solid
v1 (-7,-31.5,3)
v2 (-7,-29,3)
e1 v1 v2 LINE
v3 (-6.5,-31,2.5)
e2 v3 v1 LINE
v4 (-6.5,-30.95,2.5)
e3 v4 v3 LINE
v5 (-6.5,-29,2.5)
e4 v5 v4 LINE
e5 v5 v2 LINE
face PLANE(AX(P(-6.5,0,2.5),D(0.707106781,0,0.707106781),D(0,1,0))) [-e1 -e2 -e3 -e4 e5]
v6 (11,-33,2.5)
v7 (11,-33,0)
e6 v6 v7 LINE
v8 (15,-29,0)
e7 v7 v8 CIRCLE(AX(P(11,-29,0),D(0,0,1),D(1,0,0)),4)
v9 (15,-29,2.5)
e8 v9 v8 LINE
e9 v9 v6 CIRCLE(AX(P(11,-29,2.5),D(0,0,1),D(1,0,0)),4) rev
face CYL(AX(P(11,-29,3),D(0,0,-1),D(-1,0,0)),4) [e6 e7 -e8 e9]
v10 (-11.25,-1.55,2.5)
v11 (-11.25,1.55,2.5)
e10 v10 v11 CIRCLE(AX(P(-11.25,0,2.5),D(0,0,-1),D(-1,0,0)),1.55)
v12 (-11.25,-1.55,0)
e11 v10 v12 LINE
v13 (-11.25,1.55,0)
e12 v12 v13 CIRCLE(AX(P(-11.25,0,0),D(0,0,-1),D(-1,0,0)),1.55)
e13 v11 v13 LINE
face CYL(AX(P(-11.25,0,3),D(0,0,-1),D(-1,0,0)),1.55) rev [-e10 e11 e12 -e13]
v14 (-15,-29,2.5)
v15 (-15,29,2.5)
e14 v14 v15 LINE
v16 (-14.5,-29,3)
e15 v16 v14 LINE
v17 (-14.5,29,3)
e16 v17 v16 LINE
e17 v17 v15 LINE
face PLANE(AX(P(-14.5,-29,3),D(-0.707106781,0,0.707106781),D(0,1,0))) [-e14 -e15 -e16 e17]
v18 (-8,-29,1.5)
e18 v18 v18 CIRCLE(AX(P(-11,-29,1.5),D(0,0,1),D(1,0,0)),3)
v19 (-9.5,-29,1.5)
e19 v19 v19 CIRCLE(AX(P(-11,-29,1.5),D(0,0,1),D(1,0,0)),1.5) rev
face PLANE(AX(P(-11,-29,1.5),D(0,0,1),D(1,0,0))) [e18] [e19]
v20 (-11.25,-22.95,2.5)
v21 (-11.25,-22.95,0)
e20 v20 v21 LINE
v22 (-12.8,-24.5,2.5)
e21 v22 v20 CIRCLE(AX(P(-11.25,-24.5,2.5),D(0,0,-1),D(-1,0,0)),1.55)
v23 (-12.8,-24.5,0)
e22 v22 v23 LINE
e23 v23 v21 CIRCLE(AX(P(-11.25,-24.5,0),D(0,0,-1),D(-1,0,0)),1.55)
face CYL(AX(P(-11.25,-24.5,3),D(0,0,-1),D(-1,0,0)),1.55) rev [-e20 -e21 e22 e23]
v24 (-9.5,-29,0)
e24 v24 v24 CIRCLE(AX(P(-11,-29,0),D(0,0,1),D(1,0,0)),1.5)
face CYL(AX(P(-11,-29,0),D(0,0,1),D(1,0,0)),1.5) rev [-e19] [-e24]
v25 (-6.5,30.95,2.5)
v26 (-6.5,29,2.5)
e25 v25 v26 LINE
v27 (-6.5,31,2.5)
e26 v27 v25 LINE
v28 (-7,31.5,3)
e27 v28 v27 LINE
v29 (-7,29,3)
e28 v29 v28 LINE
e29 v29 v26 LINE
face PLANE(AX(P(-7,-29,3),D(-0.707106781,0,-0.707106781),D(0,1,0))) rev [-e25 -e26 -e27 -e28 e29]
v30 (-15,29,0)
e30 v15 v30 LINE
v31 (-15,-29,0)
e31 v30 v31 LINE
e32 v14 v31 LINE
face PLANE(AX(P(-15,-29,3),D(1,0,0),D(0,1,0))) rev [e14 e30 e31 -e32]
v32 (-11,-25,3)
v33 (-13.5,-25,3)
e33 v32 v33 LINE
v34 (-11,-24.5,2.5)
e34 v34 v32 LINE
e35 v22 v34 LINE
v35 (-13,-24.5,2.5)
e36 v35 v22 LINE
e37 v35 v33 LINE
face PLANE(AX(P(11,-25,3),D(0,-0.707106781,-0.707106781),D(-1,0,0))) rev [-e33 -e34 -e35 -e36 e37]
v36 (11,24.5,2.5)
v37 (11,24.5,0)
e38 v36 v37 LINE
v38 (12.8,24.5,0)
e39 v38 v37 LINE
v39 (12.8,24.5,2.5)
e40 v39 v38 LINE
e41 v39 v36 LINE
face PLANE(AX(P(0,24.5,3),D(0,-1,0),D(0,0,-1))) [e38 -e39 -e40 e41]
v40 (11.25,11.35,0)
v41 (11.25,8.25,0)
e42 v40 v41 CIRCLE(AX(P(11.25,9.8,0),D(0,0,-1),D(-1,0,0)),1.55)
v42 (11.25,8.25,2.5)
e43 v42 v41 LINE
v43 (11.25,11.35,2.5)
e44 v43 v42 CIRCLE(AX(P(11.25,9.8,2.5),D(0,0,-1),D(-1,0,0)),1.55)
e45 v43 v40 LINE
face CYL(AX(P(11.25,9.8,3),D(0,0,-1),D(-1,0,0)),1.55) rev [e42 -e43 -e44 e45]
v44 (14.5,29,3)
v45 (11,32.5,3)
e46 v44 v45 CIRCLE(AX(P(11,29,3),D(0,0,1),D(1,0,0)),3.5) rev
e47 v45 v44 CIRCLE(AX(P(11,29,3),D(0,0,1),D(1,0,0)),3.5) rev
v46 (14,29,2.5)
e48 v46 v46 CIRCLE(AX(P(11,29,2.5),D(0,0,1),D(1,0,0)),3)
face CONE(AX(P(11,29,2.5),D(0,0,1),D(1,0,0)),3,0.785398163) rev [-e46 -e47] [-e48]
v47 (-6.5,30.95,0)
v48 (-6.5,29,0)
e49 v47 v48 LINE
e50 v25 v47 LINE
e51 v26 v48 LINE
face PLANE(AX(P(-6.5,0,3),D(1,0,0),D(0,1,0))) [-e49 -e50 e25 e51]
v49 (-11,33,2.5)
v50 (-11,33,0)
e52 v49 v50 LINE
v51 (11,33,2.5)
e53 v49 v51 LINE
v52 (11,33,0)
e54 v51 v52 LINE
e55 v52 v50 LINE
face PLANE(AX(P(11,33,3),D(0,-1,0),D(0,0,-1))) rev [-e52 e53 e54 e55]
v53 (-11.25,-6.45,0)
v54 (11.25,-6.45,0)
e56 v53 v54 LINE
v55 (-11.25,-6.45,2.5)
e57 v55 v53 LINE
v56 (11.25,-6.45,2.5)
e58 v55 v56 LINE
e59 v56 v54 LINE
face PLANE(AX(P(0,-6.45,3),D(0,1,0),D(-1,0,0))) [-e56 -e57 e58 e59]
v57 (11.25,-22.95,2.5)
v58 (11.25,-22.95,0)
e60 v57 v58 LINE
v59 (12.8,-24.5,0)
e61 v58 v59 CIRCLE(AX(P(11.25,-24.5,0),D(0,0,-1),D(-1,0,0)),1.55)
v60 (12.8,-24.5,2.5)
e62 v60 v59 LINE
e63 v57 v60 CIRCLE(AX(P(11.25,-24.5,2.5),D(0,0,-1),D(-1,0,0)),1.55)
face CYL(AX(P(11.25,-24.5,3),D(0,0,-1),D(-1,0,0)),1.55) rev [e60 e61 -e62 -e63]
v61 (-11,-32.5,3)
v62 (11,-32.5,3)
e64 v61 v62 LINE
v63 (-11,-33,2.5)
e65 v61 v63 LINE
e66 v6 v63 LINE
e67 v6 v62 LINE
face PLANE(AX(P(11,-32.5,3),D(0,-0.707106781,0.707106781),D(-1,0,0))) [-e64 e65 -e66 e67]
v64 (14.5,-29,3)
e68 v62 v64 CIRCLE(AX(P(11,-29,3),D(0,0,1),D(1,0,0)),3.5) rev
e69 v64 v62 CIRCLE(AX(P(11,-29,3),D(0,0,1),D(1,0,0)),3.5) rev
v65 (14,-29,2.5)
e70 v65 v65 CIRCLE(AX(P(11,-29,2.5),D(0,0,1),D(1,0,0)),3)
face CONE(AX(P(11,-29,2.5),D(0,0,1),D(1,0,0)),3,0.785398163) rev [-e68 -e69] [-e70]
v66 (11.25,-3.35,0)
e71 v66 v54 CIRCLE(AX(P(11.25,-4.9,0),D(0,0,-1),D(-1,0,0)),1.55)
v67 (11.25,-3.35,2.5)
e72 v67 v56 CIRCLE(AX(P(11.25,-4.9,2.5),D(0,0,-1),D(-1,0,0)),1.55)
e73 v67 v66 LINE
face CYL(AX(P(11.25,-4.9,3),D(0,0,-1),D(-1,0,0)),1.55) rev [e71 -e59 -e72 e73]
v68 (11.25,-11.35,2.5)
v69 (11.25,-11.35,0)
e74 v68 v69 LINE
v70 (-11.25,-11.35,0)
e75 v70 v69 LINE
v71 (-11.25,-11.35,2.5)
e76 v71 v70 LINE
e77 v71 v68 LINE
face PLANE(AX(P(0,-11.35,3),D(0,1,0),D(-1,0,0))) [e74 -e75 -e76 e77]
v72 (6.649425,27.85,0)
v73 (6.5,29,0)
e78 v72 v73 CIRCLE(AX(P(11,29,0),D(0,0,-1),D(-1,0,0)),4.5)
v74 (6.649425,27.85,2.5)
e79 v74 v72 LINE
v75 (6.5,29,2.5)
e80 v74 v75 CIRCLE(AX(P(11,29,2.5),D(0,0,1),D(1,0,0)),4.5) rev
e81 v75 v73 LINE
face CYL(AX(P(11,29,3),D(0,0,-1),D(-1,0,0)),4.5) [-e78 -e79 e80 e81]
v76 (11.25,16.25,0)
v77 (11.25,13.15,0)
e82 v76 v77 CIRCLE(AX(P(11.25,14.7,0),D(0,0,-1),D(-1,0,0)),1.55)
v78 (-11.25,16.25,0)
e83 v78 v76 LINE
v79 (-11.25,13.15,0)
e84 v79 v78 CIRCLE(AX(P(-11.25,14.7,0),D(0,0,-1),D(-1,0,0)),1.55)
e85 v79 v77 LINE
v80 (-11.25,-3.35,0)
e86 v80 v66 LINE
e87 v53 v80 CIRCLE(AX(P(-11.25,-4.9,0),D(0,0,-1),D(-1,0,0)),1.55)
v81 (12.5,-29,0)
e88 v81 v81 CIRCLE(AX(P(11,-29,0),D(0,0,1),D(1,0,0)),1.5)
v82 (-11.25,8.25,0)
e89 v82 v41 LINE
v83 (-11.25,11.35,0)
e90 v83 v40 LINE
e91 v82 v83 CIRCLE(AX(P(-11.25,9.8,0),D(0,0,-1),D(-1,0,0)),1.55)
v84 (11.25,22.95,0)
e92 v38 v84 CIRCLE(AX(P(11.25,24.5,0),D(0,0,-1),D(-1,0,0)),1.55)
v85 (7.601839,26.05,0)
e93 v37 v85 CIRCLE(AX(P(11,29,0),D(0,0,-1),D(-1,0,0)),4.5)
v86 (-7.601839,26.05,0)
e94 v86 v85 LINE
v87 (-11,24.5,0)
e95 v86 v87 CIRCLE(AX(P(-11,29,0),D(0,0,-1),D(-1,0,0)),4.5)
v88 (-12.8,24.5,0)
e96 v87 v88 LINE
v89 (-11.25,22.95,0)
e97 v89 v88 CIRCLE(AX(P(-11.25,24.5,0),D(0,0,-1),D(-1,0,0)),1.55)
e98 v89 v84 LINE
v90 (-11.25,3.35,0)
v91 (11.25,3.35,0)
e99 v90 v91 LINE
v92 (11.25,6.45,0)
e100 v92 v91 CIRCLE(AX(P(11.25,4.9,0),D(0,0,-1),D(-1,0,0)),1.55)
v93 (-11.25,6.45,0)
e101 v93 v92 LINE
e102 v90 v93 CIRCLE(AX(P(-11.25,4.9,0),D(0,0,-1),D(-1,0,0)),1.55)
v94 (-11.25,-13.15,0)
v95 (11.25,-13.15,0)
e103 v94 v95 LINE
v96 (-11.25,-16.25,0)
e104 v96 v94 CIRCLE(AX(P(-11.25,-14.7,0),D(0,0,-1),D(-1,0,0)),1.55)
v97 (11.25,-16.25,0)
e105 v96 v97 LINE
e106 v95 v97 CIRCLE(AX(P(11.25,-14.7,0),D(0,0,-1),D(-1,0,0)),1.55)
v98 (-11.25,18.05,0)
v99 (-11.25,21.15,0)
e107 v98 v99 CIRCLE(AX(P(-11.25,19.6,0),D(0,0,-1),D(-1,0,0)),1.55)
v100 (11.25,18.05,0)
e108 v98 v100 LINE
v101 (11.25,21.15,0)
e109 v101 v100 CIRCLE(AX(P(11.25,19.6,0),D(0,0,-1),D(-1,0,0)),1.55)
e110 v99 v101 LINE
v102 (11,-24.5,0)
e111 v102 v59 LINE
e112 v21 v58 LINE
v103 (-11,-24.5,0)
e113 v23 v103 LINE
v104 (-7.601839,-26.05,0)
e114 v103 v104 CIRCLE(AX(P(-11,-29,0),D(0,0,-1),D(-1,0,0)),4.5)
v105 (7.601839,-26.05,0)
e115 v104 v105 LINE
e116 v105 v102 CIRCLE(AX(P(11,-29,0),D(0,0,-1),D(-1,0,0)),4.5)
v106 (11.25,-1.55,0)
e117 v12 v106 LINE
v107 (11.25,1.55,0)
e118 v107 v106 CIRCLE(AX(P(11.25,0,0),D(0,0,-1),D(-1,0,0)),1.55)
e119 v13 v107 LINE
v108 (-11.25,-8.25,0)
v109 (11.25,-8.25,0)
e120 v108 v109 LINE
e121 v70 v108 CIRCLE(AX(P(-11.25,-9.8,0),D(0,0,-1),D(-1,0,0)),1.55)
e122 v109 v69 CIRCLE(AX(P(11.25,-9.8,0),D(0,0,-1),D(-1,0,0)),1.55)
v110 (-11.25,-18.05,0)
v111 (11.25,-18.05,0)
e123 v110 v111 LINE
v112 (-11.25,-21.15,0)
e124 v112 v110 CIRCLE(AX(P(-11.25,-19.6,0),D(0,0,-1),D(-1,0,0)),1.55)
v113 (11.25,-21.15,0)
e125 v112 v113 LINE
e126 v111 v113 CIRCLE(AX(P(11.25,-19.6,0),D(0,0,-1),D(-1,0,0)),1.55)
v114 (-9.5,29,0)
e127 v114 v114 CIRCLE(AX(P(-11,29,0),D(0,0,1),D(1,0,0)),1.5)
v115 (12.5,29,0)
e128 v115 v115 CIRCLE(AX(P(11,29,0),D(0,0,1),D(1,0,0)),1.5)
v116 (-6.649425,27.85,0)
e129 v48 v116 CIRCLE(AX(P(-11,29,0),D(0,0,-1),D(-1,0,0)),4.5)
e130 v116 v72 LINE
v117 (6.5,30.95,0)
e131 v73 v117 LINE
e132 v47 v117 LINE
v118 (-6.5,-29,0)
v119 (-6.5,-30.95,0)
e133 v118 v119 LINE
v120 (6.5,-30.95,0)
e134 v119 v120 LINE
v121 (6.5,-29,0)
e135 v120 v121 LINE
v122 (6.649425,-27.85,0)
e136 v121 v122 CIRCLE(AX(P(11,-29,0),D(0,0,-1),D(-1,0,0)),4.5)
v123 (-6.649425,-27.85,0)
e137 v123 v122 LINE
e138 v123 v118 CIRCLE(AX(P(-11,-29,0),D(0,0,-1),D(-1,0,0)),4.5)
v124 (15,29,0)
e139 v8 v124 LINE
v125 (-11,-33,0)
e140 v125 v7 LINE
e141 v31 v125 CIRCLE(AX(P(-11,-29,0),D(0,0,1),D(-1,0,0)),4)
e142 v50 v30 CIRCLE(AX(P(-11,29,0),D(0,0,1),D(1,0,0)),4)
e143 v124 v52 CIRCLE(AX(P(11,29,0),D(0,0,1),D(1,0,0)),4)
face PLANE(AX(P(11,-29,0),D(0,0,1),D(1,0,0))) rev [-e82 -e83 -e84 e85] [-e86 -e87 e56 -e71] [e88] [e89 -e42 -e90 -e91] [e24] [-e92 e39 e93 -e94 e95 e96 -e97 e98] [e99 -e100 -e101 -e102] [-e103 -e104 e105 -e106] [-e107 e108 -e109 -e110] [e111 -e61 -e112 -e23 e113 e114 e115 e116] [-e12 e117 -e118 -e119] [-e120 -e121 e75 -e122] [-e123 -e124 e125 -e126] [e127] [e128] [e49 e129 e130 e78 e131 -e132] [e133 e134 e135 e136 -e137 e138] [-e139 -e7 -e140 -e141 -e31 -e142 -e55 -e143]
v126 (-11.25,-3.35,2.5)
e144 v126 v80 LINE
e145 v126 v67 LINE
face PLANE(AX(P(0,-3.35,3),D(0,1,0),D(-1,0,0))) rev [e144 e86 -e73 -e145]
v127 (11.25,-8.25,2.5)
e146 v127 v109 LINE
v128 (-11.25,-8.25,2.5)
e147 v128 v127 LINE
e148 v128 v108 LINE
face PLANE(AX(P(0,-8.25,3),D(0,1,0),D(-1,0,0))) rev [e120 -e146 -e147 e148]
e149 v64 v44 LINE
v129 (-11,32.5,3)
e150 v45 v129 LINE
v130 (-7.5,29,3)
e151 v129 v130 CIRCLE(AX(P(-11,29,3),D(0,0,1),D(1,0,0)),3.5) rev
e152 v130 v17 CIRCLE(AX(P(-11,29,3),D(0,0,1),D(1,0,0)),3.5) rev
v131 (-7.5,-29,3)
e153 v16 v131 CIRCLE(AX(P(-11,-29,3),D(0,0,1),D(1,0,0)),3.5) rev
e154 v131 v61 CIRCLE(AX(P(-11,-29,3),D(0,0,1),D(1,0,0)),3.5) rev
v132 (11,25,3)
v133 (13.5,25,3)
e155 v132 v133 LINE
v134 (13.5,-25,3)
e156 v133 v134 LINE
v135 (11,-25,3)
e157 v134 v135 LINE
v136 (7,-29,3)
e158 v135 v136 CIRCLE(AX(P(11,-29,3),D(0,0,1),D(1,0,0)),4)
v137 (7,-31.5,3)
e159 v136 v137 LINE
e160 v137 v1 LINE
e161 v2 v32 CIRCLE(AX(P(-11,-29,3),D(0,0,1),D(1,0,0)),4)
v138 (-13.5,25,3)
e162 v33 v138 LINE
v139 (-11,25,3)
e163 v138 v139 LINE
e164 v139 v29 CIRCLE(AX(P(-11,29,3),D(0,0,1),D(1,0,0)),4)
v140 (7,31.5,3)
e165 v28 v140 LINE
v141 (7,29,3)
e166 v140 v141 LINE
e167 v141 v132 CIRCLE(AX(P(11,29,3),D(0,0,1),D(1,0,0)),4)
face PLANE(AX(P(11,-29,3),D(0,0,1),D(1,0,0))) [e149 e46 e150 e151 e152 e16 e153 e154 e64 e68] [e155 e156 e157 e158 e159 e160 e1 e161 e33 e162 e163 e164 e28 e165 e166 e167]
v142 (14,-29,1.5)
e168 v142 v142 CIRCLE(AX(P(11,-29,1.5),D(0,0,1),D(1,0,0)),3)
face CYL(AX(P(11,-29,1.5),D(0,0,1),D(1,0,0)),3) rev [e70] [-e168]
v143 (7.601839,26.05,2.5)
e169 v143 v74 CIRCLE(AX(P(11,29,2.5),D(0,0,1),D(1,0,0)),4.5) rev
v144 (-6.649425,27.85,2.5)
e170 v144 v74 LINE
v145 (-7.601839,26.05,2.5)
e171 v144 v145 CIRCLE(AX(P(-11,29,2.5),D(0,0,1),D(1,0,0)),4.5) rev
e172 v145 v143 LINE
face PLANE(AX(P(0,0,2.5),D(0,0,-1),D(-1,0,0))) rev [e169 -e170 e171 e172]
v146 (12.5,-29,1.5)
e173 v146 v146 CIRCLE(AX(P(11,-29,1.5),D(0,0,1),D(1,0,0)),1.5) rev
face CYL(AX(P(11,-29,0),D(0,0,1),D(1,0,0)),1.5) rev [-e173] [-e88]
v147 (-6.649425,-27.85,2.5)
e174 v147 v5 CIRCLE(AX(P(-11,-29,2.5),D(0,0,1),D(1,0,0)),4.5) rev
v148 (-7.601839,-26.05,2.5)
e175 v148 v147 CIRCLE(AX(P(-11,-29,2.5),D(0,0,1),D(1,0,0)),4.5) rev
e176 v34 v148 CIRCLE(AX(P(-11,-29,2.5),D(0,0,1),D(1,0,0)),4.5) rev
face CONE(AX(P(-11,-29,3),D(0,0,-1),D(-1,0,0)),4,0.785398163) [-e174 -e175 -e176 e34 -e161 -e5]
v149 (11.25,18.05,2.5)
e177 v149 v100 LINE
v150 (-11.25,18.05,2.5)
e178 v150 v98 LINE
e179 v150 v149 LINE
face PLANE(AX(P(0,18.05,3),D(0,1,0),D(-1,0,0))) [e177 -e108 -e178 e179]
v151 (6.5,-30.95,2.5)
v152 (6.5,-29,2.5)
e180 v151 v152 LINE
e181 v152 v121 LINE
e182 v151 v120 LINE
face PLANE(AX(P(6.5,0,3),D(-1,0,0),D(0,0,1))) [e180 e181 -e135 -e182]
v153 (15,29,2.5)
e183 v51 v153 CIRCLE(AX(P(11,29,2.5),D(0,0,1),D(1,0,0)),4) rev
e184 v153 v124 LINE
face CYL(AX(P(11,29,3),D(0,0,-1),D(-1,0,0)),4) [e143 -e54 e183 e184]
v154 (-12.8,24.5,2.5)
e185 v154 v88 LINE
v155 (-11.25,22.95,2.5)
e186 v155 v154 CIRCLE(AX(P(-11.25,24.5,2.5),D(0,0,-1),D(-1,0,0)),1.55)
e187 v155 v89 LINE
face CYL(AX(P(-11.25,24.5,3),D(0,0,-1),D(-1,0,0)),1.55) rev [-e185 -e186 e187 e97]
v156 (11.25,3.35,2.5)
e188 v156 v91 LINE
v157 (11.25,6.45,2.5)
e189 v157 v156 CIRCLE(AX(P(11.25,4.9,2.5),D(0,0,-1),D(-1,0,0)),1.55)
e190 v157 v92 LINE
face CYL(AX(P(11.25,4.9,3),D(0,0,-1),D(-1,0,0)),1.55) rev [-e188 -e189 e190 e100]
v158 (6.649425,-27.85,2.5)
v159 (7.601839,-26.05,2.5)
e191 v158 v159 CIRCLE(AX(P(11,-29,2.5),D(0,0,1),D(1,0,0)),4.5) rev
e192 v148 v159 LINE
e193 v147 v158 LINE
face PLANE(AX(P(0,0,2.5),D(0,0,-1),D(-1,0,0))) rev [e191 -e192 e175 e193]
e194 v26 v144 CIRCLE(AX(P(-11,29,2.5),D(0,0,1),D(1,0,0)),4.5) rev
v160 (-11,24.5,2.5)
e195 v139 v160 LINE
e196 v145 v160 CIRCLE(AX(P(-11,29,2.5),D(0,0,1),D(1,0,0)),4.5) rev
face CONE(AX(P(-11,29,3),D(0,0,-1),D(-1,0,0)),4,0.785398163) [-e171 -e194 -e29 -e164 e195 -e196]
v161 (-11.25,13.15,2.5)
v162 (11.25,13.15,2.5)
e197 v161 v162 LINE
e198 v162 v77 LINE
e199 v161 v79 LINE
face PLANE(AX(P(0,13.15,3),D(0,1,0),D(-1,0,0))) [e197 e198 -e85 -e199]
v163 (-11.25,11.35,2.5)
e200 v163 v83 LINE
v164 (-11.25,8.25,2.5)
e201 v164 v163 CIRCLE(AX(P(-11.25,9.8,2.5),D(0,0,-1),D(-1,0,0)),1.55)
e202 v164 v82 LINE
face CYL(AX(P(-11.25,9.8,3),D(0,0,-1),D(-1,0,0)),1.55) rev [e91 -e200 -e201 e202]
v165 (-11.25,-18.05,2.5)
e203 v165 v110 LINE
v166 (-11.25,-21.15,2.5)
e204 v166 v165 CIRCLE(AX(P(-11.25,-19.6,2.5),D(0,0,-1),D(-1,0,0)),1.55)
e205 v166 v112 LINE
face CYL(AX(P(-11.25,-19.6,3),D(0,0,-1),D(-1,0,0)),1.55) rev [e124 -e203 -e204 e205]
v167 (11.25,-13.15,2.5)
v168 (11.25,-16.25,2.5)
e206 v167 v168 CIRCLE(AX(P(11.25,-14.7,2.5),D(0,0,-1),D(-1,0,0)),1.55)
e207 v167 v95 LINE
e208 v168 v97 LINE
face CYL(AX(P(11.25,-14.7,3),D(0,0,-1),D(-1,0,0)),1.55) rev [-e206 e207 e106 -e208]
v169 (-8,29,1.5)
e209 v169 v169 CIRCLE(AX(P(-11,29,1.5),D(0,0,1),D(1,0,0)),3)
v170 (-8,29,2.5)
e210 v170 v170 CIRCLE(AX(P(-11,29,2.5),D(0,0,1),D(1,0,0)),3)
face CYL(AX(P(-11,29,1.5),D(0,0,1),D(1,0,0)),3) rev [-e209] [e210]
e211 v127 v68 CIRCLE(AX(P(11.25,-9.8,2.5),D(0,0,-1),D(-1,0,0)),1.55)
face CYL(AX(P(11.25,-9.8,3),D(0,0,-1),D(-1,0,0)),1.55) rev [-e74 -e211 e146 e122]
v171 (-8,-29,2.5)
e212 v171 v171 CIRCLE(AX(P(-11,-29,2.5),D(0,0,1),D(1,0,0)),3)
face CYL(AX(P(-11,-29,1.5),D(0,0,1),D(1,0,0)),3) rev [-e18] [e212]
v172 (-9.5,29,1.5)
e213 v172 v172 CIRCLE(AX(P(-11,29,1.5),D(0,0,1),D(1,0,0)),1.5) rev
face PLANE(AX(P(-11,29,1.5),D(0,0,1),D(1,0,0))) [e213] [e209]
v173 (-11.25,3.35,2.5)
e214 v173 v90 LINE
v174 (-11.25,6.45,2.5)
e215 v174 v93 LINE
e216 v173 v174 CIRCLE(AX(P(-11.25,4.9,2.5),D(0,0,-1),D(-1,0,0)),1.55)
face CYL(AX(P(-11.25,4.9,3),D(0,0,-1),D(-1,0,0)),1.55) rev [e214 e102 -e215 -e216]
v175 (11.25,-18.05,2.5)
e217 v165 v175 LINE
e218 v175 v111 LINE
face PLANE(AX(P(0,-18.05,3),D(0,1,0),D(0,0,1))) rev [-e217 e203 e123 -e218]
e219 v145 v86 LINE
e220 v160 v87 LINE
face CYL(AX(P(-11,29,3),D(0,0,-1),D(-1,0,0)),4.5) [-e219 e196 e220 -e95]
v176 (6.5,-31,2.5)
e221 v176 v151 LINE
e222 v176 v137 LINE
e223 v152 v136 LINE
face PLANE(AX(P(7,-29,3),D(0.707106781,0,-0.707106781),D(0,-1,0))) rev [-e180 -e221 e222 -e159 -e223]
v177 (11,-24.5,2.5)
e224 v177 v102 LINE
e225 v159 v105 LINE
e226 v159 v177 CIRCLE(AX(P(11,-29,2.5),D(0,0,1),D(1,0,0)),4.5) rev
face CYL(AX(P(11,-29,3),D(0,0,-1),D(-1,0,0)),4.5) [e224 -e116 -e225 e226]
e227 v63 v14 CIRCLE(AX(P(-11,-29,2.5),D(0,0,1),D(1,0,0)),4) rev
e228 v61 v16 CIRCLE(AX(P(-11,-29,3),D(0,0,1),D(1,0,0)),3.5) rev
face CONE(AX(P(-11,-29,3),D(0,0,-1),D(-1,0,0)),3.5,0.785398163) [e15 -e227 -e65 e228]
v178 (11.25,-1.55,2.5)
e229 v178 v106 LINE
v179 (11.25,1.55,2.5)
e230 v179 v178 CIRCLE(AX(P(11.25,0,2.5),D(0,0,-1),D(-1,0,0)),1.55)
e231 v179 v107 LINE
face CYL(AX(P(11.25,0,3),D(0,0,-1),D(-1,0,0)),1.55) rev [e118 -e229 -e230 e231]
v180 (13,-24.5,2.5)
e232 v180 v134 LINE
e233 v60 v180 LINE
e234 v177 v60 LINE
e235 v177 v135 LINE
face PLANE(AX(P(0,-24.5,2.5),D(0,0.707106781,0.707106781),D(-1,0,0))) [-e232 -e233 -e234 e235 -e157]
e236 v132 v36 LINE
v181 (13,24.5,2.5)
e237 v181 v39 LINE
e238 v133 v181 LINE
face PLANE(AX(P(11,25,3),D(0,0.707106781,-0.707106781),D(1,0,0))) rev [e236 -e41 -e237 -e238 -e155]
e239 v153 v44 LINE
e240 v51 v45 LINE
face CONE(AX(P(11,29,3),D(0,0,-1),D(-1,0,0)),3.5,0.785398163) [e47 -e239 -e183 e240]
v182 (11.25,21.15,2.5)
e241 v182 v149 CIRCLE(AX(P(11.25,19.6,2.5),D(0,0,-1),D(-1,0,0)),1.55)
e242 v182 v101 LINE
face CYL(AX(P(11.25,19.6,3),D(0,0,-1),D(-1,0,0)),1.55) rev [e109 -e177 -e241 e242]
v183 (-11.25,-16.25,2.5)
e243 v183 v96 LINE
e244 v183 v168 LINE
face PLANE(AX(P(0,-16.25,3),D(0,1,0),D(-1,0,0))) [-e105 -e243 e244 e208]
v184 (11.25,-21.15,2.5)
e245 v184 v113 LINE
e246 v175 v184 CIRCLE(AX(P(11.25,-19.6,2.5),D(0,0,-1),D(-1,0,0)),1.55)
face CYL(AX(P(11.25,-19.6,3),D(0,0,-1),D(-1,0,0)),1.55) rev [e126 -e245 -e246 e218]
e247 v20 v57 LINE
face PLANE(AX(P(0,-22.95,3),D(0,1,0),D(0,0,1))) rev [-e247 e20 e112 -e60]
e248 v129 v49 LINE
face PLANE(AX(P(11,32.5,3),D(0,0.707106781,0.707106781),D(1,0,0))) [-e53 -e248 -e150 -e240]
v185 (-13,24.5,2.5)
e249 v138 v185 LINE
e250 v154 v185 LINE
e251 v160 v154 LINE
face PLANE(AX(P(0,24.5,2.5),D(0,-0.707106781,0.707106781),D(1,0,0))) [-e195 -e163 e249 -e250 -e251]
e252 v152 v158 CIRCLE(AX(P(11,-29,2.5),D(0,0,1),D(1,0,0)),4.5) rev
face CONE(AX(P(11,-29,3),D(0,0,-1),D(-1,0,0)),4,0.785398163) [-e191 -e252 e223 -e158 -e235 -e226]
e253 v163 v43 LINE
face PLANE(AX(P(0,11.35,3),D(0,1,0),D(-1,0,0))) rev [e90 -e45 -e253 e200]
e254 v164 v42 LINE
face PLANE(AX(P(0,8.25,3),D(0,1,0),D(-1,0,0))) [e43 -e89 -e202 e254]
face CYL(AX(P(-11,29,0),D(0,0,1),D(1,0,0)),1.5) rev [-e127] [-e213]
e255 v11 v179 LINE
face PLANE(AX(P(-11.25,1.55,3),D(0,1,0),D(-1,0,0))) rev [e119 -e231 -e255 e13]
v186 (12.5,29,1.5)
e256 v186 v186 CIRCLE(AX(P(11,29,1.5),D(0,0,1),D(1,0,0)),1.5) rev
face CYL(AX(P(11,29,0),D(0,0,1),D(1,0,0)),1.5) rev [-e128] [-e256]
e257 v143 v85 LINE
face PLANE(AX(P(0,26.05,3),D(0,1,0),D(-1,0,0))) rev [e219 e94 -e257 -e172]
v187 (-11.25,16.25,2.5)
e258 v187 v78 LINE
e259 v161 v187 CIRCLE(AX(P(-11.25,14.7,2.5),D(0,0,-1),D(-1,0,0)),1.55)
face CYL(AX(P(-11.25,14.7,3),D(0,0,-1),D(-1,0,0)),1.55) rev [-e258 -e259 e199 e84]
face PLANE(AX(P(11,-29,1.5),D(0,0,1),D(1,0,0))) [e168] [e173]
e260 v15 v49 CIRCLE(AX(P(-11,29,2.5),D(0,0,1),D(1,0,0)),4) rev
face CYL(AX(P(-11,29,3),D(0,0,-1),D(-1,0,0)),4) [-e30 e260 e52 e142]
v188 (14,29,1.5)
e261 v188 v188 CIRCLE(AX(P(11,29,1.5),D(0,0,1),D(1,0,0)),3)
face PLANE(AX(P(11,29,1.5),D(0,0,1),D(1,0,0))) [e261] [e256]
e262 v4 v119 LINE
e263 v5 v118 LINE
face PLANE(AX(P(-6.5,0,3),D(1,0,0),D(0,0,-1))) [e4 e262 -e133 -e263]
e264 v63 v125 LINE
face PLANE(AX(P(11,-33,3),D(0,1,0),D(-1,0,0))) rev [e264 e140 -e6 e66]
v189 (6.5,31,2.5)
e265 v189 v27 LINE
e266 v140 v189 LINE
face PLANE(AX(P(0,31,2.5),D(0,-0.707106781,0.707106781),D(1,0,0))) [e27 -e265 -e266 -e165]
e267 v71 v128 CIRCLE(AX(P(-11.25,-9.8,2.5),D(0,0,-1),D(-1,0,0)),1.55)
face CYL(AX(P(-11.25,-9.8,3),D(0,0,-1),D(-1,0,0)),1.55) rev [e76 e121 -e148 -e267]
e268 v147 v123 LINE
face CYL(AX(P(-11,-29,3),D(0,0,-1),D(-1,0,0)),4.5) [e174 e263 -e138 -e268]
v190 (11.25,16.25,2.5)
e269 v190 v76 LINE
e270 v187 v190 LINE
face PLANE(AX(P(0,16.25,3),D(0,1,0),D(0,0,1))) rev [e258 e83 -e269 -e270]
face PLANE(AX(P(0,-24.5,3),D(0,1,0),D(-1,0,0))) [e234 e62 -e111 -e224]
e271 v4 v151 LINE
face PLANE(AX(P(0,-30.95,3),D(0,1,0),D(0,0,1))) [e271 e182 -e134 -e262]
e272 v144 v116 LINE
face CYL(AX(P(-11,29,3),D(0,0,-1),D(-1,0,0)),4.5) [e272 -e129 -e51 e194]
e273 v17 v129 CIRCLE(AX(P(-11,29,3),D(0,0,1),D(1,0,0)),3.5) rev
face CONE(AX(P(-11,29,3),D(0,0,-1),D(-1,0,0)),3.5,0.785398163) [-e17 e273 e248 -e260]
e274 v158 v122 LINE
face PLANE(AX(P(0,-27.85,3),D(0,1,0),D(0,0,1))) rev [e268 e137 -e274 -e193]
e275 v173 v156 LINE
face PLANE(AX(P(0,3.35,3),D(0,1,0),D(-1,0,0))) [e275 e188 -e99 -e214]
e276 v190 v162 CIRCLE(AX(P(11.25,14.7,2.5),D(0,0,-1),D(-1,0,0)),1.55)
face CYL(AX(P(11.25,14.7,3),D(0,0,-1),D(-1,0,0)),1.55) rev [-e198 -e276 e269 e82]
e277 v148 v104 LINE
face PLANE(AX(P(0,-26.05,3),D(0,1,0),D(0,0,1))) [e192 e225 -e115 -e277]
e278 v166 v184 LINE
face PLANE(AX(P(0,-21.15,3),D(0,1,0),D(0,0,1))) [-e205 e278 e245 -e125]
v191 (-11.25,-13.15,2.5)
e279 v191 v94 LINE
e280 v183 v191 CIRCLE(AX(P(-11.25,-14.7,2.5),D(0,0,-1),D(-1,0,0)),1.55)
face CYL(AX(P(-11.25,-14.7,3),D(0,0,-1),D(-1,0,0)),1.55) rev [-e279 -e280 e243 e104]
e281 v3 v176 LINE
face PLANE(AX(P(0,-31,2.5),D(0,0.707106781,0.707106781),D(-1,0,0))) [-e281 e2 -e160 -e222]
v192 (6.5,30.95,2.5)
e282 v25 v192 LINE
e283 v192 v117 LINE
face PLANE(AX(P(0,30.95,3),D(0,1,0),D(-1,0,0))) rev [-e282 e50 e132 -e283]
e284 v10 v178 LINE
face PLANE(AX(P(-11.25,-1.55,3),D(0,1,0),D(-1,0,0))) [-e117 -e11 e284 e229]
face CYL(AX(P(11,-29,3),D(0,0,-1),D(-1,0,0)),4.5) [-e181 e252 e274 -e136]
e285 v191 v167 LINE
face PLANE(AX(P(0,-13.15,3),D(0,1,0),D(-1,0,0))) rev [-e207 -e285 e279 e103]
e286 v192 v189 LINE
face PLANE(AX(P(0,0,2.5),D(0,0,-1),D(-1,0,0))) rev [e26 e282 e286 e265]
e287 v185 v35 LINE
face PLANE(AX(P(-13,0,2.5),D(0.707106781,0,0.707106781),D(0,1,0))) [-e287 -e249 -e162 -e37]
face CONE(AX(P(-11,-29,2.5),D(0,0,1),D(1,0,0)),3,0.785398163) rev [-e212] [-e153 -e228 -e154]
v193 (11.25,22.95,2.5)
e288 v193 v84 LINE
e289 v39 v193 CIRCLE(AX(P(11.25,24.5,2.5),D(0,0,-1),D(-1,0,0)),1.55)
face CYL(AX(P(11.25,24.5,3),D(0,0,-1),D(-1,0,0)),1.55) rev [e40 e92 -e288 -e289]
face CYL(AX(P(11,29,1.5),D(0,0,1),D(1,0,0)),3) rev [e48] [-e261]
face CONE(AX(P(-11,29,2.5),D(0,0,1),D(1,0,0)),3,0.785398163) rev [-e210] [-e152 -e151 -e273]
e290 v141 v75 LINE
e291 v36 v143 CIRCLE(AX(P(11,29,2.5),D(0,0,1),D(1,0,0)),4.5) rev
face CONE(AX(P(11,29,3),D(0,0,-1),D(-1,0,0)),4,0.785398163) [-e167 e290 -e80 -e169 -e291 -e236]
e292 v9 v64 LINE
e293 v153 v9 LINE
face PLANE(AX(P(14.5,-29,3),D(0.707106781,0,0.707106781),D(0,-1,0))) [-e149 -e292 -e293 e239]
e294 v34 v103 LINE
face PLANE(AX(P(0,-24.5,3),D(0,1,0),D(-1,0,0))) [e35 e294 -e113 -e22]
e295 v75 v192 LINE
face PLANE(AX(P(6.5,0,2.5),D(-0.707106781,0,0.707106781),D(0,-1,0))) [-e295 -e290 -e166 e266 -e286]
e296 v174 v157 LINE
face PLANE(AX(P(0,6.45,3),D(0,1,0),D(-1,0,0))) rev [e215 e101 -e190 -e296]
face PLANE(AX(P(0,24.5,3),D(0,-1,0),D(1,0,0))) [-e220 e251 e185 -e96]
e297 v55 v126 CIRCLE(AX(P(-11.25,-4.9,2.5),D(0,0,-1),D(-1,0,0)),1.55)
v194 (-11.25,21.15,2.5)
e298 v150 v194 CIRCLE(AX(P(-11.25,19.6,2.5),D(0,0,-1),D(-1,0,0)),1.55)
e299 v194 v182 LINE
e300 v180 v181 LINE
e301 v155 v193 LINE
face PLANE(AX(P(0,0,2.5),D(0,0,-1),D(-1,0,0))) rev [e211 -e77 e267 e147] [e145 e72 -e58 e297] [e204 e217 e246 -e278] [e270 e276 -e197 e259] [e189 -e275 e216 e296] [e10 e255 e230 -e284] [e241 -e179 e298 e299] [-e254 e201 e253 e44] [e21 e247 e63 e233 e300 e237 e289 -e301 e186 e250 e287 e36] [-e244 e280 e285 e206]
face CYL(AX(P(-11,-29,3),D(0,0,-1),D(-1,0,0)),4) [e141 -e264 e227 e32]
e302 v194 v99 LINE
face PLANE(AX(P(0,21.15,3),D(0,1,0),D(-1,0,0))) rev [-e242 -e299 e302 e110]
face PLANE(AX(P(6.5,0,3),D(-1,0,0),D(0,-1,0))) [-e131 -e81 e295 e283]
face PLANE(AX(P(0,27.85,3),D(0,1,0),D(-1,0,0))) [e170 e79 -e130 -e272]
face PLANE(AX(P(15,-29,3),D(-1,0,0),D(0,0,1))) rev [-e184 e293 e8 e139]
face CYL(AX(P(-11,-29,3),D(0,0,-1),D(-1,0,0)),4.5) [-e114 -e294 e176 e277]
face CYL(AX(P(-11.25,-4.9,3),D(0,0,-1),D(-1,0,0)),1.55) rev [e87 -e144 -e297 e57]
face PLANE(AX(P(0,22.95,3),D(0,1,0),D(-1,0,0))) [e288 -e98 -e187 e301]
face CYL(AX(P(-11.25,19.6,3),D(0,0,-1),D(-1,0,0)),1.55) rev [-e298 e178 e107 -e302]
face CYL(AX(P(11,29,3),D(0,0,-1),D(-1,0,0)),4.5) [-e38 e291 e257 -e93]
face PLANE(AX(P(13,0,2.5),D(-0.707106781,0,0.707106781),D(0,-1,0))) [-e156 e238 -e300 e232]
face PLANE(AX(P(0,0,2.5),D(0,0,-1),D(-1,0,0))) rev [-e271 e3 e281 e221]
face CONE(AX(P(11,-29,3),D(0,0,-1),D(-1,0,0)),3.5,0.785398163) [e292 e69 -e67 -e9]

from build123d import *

# Parameters (mm, degrees)
BASE_DEPTH          = 3
SKETCH2_R           = 1.5
CUT_EXTRUDE1_DEPTH  = 37.373066959
CUT_EXTRUDE2_DEPTH  = 37.373066959
SKETCH6_R           = 3
CUT_EXTRUDE3_DEPTH  = 1.5
CHAMFER2_SIZE       = 0.5
BOSS_EXTRUDE1_START = -2.5
BOSS_EXTRUDE1_DEPTH = 2.5
CUT_EXTRUDE4_START  = -2.5
CUT_EXTRUDE4_DEPTH  = 2.5


# Read off the part's stored shape, not the designer's step: Cut-Extrude4
with BuildPart() as part:
    # Sketch1 → Base (new body)
    with BuildSketch(Plane.XY):
        with BuildLine():
            Line((11, -33), (-11, -33))
            ThreePointArc((-11, -33), (-13.828427125, -31.828427125), (-15, -29))
            Line((-15, -29), (-15, 29))
            ThreePointArc((-15, 29), (-13.828427125, 31.828427125), (-11, 33))
            Line((-11, 33), (11, 33))
            ThreePointArc((11, 33), (13.828427125, 31.828427125), (15, 29))
            Line((15, 29), (15, -29))
            ThreePointArc((15, -29), (13.828427125, -31.828427125), (11, -33))
        make_face()
    extrude(amount=BASE_DEPTH)

    # Sketch2 → Cut-Extrude1 (cut, through all)
    with BuildSketch(Plane.XY.offset(3)):
        with Locations((-11, 29)):
            Circle(SKETCH2_R)
        with Locations((-11, -29)):
            Circle(SKETCH2_R)
        with Locations((11, -29)):
            Circle(SKETCH2_R)
        with Locations((11, 29)):
            Circle(SKETCH2_R)
    extrude(amount=-CUT_EXTRUDE1_DEPTH, mode=Mode.SUBTRACT)

    # Sketch3 → Cut-Extrude2 (cut, through all)
    with BuildSketch(Plane.XY.offset(3)):
        with BuildLine():
            Line((6.5, 29), (6.5, 31))
            Line((6.5, 31), (-6.5, 31))
            Line((-6.5, 31), (-6.5, 29))
            ThreePointArc((-6.5, 29), (-7.818019485, 25.818019485), (-11, 24.5))
            Line((-11, 24.5), (-13, 24.5))
            Line((-13, 24.5), (-13, -24.5))
            Line((-13, -24.5), (-11, -24.5))
            ThreePointArc((-11, -24.5), (-7.818019485, -25.818019485), (-6.5, -29))
            Line((-6.5, -29), (-6.5, -31))
            Line((-6.5, -31), (6.5, -31))
            Line((6.5, -31), (6.5, -29))
            ThreePointArc((6.5, -29), (7.818019485, -25.818019485), (11, -24.5))
            Line((11, -24.5), (13, -24.5))
            Line((13, -24.5), (13, 24.5))
            Line((13, 24.5), (11, 24.5))
            ThreePointArc((11, 24.5), (7.818019485, 25.818019485), (6.5, 29))
        make_face()
    extrude(amount=-CUT_EXTRUDE2_DEPTH, mode=Mode.SUBTRACT)

    # Sketch6 → Cut-Extrude3 (cut)
    with BuildSketch(Plane.XY.offset(3)):
        with Locations((-11, -29)):
            Circle(SKETCH6_R)
        with Locations((11, -29)):
            Circle(SKETCH6_R)
        with Locations((11, 29)):
            Circle(SKETCH6_R)
        with Locations((-11, 29)):
            Circle(SKETCH6_R)
    extrude(amount=-CUT_EXTRUDE3_DEPTH, mode=Mode.SUBTRACT)

    # Chamfer2
    chamfer2_edges = [part.edges().sort_by_distance(p)[0] for p in [
        (7.818019485, 25.818019485, 3),
        (13, 0, 3),
        (7.818019485, -25.818019485, 3),
        (-7.818019485, -25.818019485, 3),
        (-13, 0, 3),
        (-7.818019485, 25.818019485, 3),
        (0, -33, 3),
        (-13.828427125, -31.828427125, 3),
        (-15, 0, 3),
        (-13.828427125, 31.828427125, 3),
        (0, 33, 3),
        (13.828427125, 31.828427125, 3),
        (15, 0, 3),
        (13.828427125, -31.828427125, 3),
        (-14, -29, 3),
        (-14, 29, 3),
        (8, 29, 3),
        (8, -29, 3),
        (0, -31, 3),
        (0, 31, 3),
        (12, 24.5, 3),
        (6.5, 30, 3),
        (-6.5, 30, 3),
        (-12, 24.5, 3),
        (-12, -24.5, 3),
        (-6.5, -30, 3),
        (6.5, -30, 3),
        (12, -24.5, 3),
    ]]
    chamfer(chamfer2_edges, length=CHAMFER2_SIZE - 0.0001)  # a hair under: the kernel refuses the full size

    # Sketch9 → Boss-Extrude1 (add)
    with BuildSketch(Plane(origin=(0, 0, 0), x_dir=(-1, 0, 0), z_dir=(0, 0, -1)).offset(BOSS_EXTRUDE1_START)):
        with BuildLine():
            ThreePointArc((-6.5, -29), (-7.818019485, -25.818019485), (-11, -24.5))
            Line((-11, -24.5), (-13, -24.5))
            Line((-13, -24.5), (-13, 24.5))
            Line((-13, 24.5), (-11, 24.5))
            ThreePointArc((-11, 24.5), (-7.818019485, 25.818019485), (-6.5, 29))
            Line((-6.5, 29), (-6.5, 31))
            Line((-6.5, 31), (6.5, 31))
            Line((6.5, 31), (6.5, 29))
            ThreePointArc((6.5, 29), (7.818019485, 25.818019485), (11, 24.5))
            Line((11, 24.5), (13, 24.5))
            Line((13, 24.5), (13, -24.5))
            Line((13, -24.5), (11, -24.5))
            ThreePointArc((11, -24.5), (7.818019485, -25.818019485), (6.5, -29))
            Line((6.5, -29), (6.5, -31))
            Line((6.5, -31), (-6.5, -31))
            Line((-6.5, -31), (-6.5, -29))
        make_face()
    extrude(amount=BOSS_EXTRUDE1_DEPTH)

    # Cut-Extrude4 outline → Cut-Extrude4 (cut)
    with BuildSketch(Plane(origin=(0, 0, 0), x_dir=(-1, 0, 0), z_dir=(0, 0, -1)).offset(CUT_EXTRUDE4_START)):
        with BuildLine():
            ThreePointArc((11.25, -6.45), (12.8, -4.9), (11.25, -3.35))
            Line((11.25, -3.35), (-11.25, -3.35))
            ThreePointArc((-11.25, -3.35), (-12.8, -4.9), (-11.25, -6.45))
            Line((-11.25, -6.45), (11.25, -6.45))
        make_face()
        with BuildLine():
            ThreePointArc((11.25, 18.05), (12.8, 19.6), (11.25, 21.15))
            Line((11.25, 21.15), (-11.25, 21.15))
            ThreePointArc((-11.25, 21.15), (-12.8, 19.6), (-11.25, 18.05))
            Line((-11.25, 18.05), (11.25, 18.05))
        make_face()
        with BuildLine():
            Line((-11, 24.5), (-12.8, 24.5))
            ThreePointArc((-12.8, 24.5), (-12.346015511, 23.403984489), (-11.25, 22.95))
            Line((-11.25, 22.95), (11.25, 22.95))
            ThreePointArc((11.25, 22.95), (12.346015511, 23.403984489), (12.8, 24.5))
            Line((12.8, 24.5), (11, 24.5))
            ThreePointArc((11, 24.5), (9.13251506, 24.905796781), (7.601838732, 26.05))
            Line((7.601838732, 26.05), (-7.601838732, 26.05))
            ThreePointArc((-7.601838732, 26.05), (-9.13251506, 24.905796781), (-11, 24.5))
        make_face()
        with BuildLine():
            ThreePointArc((-6.5, 29), (-6.537512687, 28.420166419), (-6.649425325, 27.85))
            Line((-6.649425325, 27.85), (6.649425325, 27.85))
            ThreePointArc((6.649425325, 27.85), (6.537512687, 28.420166419), (6.5, 29))
            Line((6.5, 29), (6.5, 30.95))
            Line((6.5, 30.95), (-6.5, 30.95))
            Line((-6.5, 30.95), (-6.5, 29))
        make_face()
        with BuildLine():
            Line((6.5, -30.95), (6.5, -29))
            ThreePointArc((6.5, -29), (6.537512687, -28.420166419), (6.649425325, -27.85))
            Line((6.649425325, -27.85), (-6.649425325, -27.85))
            ThreePointArc((-6.649425325, -27.85), (-6.537512687, -28.420166419), (-6.5, -29))
            Line((-6.5, -29), (-6.5, -30.95))
            Line((-6.5, -30.95), (6.5, -30.95))
        make_face()
        with BuildLine():
            Line((-11.25, -1.55), (11.25, -1.55))
            ThreePointArc((11.25, -1.55), (12.8, 0), (11.25, 1.55))
            Line((11.25, 1.55), (-11.25, 1.55))
            ThreePointArc((-11.25, 1.55), (-12.8, 0), (-11.25, -1.55))
        make_face()
        with BuildLine():
            ThreePointArc((11.25, -11.35), (12.8, -9.8), (11.25, -8.25))
            Line((11.25, -8.25), (-11.25, -8.25))
            ThreePointArc((-11.25, -8.25), (-12.8, -9.8), (-11.25, -11.35))
            Line((-11.25, -11.35), (11.25, -11.35))
        make_face()
        with BuildLine():
            ThreePointArc((11.25, -16.25), (12.8, -14.7), (11.25, -13.15))
            Line((11.25, -13.15), (-11.25, -13.15))
            ThreePointArc((-11.25, -13.15), (-12.8, -14.7), (-11.25, -16.25))
            Line((-11.25, -16.25), (11.25, -16.25))
        make_face()
        with BuildLine():
            ThreePointArc((11.25, -21.15), (12.8, -19.6), (11.25, -18.05))
            Line((11.25, -18.05), (-11.25, -18.05))
            ThreePointArc((-11.25, -18.05), (-12.8, -19.6), (-11.25, -21.15))
            Line((-11.25, -21.15), (11.25, -21.15))
        make_face()
        with BuildLine():
            ThreePointArc((12.8, -24.5), (12.346015511, -23.403984489), (11.25, -22.95))
            Line((11.25, -22.95), (-11.25, -22.95))
            ThreePointArc((-11.25, -22.95), (-12.346015511, -23.403984489), (-12.8, -24.5))
            Line((-12.8, -24.5), (-11, -24.5))
            ThreePointArc((-11, -24.5), (-9.13251506, -24.905796781), (-7.601838732, -26.05))
            Line((-7.601838732, -26.05), (7.601838732, -26.05))
            ThreePointArc((7.601838732, -26.05), (9.13251506, -24.905796781), (11, -24.5))
            Line((11, -24.5), (12.8, -24.5))
        make_face()
        with BuildLine():
            ThreePointArc((11.25, 3.35), (12.8, 4.9), (11.25, 6.45))
            Line((11.25, 6.45), (-11.25, 6.45))
            ThreePointArc((-11.25, 6.45), (-12.8, 4.9), (-11.25, 3.35))
            Line((-11.25, 3.35), (11.25, 3.35))
        make_face()
        with BuildLine():
            ThreePointArc((11.25, 8.25), (12.8, 9.8), (11.25, 11.35))
            Line((11.25, 11.35), (-11.25, 11.35))
            ThreePointArc((-11.25, 11.35), (-12.8, 9.8), (-11.25, 8.25))
            Line((-11.25, 8.25), (11.25, 8.25))
        make_face()
        with BuildLine():
            ThreePointArc((11.25, 13.15), (12.8, 14.7), (11.25, 16.25))
            Line((11.25, 16.25), (-11.25, 16.25))
            ThreePointArc((-11.25, 16.25), (-12.8, 14.7), (-11.25, 13.15))
            Line((-11.25, 13.15), (11.25, 13.15))
        make_face()
    extrude(amount=CUT_EXTRUDE4_DEPTH, mode=Mode.SUBTRACT)


solid = part.part
